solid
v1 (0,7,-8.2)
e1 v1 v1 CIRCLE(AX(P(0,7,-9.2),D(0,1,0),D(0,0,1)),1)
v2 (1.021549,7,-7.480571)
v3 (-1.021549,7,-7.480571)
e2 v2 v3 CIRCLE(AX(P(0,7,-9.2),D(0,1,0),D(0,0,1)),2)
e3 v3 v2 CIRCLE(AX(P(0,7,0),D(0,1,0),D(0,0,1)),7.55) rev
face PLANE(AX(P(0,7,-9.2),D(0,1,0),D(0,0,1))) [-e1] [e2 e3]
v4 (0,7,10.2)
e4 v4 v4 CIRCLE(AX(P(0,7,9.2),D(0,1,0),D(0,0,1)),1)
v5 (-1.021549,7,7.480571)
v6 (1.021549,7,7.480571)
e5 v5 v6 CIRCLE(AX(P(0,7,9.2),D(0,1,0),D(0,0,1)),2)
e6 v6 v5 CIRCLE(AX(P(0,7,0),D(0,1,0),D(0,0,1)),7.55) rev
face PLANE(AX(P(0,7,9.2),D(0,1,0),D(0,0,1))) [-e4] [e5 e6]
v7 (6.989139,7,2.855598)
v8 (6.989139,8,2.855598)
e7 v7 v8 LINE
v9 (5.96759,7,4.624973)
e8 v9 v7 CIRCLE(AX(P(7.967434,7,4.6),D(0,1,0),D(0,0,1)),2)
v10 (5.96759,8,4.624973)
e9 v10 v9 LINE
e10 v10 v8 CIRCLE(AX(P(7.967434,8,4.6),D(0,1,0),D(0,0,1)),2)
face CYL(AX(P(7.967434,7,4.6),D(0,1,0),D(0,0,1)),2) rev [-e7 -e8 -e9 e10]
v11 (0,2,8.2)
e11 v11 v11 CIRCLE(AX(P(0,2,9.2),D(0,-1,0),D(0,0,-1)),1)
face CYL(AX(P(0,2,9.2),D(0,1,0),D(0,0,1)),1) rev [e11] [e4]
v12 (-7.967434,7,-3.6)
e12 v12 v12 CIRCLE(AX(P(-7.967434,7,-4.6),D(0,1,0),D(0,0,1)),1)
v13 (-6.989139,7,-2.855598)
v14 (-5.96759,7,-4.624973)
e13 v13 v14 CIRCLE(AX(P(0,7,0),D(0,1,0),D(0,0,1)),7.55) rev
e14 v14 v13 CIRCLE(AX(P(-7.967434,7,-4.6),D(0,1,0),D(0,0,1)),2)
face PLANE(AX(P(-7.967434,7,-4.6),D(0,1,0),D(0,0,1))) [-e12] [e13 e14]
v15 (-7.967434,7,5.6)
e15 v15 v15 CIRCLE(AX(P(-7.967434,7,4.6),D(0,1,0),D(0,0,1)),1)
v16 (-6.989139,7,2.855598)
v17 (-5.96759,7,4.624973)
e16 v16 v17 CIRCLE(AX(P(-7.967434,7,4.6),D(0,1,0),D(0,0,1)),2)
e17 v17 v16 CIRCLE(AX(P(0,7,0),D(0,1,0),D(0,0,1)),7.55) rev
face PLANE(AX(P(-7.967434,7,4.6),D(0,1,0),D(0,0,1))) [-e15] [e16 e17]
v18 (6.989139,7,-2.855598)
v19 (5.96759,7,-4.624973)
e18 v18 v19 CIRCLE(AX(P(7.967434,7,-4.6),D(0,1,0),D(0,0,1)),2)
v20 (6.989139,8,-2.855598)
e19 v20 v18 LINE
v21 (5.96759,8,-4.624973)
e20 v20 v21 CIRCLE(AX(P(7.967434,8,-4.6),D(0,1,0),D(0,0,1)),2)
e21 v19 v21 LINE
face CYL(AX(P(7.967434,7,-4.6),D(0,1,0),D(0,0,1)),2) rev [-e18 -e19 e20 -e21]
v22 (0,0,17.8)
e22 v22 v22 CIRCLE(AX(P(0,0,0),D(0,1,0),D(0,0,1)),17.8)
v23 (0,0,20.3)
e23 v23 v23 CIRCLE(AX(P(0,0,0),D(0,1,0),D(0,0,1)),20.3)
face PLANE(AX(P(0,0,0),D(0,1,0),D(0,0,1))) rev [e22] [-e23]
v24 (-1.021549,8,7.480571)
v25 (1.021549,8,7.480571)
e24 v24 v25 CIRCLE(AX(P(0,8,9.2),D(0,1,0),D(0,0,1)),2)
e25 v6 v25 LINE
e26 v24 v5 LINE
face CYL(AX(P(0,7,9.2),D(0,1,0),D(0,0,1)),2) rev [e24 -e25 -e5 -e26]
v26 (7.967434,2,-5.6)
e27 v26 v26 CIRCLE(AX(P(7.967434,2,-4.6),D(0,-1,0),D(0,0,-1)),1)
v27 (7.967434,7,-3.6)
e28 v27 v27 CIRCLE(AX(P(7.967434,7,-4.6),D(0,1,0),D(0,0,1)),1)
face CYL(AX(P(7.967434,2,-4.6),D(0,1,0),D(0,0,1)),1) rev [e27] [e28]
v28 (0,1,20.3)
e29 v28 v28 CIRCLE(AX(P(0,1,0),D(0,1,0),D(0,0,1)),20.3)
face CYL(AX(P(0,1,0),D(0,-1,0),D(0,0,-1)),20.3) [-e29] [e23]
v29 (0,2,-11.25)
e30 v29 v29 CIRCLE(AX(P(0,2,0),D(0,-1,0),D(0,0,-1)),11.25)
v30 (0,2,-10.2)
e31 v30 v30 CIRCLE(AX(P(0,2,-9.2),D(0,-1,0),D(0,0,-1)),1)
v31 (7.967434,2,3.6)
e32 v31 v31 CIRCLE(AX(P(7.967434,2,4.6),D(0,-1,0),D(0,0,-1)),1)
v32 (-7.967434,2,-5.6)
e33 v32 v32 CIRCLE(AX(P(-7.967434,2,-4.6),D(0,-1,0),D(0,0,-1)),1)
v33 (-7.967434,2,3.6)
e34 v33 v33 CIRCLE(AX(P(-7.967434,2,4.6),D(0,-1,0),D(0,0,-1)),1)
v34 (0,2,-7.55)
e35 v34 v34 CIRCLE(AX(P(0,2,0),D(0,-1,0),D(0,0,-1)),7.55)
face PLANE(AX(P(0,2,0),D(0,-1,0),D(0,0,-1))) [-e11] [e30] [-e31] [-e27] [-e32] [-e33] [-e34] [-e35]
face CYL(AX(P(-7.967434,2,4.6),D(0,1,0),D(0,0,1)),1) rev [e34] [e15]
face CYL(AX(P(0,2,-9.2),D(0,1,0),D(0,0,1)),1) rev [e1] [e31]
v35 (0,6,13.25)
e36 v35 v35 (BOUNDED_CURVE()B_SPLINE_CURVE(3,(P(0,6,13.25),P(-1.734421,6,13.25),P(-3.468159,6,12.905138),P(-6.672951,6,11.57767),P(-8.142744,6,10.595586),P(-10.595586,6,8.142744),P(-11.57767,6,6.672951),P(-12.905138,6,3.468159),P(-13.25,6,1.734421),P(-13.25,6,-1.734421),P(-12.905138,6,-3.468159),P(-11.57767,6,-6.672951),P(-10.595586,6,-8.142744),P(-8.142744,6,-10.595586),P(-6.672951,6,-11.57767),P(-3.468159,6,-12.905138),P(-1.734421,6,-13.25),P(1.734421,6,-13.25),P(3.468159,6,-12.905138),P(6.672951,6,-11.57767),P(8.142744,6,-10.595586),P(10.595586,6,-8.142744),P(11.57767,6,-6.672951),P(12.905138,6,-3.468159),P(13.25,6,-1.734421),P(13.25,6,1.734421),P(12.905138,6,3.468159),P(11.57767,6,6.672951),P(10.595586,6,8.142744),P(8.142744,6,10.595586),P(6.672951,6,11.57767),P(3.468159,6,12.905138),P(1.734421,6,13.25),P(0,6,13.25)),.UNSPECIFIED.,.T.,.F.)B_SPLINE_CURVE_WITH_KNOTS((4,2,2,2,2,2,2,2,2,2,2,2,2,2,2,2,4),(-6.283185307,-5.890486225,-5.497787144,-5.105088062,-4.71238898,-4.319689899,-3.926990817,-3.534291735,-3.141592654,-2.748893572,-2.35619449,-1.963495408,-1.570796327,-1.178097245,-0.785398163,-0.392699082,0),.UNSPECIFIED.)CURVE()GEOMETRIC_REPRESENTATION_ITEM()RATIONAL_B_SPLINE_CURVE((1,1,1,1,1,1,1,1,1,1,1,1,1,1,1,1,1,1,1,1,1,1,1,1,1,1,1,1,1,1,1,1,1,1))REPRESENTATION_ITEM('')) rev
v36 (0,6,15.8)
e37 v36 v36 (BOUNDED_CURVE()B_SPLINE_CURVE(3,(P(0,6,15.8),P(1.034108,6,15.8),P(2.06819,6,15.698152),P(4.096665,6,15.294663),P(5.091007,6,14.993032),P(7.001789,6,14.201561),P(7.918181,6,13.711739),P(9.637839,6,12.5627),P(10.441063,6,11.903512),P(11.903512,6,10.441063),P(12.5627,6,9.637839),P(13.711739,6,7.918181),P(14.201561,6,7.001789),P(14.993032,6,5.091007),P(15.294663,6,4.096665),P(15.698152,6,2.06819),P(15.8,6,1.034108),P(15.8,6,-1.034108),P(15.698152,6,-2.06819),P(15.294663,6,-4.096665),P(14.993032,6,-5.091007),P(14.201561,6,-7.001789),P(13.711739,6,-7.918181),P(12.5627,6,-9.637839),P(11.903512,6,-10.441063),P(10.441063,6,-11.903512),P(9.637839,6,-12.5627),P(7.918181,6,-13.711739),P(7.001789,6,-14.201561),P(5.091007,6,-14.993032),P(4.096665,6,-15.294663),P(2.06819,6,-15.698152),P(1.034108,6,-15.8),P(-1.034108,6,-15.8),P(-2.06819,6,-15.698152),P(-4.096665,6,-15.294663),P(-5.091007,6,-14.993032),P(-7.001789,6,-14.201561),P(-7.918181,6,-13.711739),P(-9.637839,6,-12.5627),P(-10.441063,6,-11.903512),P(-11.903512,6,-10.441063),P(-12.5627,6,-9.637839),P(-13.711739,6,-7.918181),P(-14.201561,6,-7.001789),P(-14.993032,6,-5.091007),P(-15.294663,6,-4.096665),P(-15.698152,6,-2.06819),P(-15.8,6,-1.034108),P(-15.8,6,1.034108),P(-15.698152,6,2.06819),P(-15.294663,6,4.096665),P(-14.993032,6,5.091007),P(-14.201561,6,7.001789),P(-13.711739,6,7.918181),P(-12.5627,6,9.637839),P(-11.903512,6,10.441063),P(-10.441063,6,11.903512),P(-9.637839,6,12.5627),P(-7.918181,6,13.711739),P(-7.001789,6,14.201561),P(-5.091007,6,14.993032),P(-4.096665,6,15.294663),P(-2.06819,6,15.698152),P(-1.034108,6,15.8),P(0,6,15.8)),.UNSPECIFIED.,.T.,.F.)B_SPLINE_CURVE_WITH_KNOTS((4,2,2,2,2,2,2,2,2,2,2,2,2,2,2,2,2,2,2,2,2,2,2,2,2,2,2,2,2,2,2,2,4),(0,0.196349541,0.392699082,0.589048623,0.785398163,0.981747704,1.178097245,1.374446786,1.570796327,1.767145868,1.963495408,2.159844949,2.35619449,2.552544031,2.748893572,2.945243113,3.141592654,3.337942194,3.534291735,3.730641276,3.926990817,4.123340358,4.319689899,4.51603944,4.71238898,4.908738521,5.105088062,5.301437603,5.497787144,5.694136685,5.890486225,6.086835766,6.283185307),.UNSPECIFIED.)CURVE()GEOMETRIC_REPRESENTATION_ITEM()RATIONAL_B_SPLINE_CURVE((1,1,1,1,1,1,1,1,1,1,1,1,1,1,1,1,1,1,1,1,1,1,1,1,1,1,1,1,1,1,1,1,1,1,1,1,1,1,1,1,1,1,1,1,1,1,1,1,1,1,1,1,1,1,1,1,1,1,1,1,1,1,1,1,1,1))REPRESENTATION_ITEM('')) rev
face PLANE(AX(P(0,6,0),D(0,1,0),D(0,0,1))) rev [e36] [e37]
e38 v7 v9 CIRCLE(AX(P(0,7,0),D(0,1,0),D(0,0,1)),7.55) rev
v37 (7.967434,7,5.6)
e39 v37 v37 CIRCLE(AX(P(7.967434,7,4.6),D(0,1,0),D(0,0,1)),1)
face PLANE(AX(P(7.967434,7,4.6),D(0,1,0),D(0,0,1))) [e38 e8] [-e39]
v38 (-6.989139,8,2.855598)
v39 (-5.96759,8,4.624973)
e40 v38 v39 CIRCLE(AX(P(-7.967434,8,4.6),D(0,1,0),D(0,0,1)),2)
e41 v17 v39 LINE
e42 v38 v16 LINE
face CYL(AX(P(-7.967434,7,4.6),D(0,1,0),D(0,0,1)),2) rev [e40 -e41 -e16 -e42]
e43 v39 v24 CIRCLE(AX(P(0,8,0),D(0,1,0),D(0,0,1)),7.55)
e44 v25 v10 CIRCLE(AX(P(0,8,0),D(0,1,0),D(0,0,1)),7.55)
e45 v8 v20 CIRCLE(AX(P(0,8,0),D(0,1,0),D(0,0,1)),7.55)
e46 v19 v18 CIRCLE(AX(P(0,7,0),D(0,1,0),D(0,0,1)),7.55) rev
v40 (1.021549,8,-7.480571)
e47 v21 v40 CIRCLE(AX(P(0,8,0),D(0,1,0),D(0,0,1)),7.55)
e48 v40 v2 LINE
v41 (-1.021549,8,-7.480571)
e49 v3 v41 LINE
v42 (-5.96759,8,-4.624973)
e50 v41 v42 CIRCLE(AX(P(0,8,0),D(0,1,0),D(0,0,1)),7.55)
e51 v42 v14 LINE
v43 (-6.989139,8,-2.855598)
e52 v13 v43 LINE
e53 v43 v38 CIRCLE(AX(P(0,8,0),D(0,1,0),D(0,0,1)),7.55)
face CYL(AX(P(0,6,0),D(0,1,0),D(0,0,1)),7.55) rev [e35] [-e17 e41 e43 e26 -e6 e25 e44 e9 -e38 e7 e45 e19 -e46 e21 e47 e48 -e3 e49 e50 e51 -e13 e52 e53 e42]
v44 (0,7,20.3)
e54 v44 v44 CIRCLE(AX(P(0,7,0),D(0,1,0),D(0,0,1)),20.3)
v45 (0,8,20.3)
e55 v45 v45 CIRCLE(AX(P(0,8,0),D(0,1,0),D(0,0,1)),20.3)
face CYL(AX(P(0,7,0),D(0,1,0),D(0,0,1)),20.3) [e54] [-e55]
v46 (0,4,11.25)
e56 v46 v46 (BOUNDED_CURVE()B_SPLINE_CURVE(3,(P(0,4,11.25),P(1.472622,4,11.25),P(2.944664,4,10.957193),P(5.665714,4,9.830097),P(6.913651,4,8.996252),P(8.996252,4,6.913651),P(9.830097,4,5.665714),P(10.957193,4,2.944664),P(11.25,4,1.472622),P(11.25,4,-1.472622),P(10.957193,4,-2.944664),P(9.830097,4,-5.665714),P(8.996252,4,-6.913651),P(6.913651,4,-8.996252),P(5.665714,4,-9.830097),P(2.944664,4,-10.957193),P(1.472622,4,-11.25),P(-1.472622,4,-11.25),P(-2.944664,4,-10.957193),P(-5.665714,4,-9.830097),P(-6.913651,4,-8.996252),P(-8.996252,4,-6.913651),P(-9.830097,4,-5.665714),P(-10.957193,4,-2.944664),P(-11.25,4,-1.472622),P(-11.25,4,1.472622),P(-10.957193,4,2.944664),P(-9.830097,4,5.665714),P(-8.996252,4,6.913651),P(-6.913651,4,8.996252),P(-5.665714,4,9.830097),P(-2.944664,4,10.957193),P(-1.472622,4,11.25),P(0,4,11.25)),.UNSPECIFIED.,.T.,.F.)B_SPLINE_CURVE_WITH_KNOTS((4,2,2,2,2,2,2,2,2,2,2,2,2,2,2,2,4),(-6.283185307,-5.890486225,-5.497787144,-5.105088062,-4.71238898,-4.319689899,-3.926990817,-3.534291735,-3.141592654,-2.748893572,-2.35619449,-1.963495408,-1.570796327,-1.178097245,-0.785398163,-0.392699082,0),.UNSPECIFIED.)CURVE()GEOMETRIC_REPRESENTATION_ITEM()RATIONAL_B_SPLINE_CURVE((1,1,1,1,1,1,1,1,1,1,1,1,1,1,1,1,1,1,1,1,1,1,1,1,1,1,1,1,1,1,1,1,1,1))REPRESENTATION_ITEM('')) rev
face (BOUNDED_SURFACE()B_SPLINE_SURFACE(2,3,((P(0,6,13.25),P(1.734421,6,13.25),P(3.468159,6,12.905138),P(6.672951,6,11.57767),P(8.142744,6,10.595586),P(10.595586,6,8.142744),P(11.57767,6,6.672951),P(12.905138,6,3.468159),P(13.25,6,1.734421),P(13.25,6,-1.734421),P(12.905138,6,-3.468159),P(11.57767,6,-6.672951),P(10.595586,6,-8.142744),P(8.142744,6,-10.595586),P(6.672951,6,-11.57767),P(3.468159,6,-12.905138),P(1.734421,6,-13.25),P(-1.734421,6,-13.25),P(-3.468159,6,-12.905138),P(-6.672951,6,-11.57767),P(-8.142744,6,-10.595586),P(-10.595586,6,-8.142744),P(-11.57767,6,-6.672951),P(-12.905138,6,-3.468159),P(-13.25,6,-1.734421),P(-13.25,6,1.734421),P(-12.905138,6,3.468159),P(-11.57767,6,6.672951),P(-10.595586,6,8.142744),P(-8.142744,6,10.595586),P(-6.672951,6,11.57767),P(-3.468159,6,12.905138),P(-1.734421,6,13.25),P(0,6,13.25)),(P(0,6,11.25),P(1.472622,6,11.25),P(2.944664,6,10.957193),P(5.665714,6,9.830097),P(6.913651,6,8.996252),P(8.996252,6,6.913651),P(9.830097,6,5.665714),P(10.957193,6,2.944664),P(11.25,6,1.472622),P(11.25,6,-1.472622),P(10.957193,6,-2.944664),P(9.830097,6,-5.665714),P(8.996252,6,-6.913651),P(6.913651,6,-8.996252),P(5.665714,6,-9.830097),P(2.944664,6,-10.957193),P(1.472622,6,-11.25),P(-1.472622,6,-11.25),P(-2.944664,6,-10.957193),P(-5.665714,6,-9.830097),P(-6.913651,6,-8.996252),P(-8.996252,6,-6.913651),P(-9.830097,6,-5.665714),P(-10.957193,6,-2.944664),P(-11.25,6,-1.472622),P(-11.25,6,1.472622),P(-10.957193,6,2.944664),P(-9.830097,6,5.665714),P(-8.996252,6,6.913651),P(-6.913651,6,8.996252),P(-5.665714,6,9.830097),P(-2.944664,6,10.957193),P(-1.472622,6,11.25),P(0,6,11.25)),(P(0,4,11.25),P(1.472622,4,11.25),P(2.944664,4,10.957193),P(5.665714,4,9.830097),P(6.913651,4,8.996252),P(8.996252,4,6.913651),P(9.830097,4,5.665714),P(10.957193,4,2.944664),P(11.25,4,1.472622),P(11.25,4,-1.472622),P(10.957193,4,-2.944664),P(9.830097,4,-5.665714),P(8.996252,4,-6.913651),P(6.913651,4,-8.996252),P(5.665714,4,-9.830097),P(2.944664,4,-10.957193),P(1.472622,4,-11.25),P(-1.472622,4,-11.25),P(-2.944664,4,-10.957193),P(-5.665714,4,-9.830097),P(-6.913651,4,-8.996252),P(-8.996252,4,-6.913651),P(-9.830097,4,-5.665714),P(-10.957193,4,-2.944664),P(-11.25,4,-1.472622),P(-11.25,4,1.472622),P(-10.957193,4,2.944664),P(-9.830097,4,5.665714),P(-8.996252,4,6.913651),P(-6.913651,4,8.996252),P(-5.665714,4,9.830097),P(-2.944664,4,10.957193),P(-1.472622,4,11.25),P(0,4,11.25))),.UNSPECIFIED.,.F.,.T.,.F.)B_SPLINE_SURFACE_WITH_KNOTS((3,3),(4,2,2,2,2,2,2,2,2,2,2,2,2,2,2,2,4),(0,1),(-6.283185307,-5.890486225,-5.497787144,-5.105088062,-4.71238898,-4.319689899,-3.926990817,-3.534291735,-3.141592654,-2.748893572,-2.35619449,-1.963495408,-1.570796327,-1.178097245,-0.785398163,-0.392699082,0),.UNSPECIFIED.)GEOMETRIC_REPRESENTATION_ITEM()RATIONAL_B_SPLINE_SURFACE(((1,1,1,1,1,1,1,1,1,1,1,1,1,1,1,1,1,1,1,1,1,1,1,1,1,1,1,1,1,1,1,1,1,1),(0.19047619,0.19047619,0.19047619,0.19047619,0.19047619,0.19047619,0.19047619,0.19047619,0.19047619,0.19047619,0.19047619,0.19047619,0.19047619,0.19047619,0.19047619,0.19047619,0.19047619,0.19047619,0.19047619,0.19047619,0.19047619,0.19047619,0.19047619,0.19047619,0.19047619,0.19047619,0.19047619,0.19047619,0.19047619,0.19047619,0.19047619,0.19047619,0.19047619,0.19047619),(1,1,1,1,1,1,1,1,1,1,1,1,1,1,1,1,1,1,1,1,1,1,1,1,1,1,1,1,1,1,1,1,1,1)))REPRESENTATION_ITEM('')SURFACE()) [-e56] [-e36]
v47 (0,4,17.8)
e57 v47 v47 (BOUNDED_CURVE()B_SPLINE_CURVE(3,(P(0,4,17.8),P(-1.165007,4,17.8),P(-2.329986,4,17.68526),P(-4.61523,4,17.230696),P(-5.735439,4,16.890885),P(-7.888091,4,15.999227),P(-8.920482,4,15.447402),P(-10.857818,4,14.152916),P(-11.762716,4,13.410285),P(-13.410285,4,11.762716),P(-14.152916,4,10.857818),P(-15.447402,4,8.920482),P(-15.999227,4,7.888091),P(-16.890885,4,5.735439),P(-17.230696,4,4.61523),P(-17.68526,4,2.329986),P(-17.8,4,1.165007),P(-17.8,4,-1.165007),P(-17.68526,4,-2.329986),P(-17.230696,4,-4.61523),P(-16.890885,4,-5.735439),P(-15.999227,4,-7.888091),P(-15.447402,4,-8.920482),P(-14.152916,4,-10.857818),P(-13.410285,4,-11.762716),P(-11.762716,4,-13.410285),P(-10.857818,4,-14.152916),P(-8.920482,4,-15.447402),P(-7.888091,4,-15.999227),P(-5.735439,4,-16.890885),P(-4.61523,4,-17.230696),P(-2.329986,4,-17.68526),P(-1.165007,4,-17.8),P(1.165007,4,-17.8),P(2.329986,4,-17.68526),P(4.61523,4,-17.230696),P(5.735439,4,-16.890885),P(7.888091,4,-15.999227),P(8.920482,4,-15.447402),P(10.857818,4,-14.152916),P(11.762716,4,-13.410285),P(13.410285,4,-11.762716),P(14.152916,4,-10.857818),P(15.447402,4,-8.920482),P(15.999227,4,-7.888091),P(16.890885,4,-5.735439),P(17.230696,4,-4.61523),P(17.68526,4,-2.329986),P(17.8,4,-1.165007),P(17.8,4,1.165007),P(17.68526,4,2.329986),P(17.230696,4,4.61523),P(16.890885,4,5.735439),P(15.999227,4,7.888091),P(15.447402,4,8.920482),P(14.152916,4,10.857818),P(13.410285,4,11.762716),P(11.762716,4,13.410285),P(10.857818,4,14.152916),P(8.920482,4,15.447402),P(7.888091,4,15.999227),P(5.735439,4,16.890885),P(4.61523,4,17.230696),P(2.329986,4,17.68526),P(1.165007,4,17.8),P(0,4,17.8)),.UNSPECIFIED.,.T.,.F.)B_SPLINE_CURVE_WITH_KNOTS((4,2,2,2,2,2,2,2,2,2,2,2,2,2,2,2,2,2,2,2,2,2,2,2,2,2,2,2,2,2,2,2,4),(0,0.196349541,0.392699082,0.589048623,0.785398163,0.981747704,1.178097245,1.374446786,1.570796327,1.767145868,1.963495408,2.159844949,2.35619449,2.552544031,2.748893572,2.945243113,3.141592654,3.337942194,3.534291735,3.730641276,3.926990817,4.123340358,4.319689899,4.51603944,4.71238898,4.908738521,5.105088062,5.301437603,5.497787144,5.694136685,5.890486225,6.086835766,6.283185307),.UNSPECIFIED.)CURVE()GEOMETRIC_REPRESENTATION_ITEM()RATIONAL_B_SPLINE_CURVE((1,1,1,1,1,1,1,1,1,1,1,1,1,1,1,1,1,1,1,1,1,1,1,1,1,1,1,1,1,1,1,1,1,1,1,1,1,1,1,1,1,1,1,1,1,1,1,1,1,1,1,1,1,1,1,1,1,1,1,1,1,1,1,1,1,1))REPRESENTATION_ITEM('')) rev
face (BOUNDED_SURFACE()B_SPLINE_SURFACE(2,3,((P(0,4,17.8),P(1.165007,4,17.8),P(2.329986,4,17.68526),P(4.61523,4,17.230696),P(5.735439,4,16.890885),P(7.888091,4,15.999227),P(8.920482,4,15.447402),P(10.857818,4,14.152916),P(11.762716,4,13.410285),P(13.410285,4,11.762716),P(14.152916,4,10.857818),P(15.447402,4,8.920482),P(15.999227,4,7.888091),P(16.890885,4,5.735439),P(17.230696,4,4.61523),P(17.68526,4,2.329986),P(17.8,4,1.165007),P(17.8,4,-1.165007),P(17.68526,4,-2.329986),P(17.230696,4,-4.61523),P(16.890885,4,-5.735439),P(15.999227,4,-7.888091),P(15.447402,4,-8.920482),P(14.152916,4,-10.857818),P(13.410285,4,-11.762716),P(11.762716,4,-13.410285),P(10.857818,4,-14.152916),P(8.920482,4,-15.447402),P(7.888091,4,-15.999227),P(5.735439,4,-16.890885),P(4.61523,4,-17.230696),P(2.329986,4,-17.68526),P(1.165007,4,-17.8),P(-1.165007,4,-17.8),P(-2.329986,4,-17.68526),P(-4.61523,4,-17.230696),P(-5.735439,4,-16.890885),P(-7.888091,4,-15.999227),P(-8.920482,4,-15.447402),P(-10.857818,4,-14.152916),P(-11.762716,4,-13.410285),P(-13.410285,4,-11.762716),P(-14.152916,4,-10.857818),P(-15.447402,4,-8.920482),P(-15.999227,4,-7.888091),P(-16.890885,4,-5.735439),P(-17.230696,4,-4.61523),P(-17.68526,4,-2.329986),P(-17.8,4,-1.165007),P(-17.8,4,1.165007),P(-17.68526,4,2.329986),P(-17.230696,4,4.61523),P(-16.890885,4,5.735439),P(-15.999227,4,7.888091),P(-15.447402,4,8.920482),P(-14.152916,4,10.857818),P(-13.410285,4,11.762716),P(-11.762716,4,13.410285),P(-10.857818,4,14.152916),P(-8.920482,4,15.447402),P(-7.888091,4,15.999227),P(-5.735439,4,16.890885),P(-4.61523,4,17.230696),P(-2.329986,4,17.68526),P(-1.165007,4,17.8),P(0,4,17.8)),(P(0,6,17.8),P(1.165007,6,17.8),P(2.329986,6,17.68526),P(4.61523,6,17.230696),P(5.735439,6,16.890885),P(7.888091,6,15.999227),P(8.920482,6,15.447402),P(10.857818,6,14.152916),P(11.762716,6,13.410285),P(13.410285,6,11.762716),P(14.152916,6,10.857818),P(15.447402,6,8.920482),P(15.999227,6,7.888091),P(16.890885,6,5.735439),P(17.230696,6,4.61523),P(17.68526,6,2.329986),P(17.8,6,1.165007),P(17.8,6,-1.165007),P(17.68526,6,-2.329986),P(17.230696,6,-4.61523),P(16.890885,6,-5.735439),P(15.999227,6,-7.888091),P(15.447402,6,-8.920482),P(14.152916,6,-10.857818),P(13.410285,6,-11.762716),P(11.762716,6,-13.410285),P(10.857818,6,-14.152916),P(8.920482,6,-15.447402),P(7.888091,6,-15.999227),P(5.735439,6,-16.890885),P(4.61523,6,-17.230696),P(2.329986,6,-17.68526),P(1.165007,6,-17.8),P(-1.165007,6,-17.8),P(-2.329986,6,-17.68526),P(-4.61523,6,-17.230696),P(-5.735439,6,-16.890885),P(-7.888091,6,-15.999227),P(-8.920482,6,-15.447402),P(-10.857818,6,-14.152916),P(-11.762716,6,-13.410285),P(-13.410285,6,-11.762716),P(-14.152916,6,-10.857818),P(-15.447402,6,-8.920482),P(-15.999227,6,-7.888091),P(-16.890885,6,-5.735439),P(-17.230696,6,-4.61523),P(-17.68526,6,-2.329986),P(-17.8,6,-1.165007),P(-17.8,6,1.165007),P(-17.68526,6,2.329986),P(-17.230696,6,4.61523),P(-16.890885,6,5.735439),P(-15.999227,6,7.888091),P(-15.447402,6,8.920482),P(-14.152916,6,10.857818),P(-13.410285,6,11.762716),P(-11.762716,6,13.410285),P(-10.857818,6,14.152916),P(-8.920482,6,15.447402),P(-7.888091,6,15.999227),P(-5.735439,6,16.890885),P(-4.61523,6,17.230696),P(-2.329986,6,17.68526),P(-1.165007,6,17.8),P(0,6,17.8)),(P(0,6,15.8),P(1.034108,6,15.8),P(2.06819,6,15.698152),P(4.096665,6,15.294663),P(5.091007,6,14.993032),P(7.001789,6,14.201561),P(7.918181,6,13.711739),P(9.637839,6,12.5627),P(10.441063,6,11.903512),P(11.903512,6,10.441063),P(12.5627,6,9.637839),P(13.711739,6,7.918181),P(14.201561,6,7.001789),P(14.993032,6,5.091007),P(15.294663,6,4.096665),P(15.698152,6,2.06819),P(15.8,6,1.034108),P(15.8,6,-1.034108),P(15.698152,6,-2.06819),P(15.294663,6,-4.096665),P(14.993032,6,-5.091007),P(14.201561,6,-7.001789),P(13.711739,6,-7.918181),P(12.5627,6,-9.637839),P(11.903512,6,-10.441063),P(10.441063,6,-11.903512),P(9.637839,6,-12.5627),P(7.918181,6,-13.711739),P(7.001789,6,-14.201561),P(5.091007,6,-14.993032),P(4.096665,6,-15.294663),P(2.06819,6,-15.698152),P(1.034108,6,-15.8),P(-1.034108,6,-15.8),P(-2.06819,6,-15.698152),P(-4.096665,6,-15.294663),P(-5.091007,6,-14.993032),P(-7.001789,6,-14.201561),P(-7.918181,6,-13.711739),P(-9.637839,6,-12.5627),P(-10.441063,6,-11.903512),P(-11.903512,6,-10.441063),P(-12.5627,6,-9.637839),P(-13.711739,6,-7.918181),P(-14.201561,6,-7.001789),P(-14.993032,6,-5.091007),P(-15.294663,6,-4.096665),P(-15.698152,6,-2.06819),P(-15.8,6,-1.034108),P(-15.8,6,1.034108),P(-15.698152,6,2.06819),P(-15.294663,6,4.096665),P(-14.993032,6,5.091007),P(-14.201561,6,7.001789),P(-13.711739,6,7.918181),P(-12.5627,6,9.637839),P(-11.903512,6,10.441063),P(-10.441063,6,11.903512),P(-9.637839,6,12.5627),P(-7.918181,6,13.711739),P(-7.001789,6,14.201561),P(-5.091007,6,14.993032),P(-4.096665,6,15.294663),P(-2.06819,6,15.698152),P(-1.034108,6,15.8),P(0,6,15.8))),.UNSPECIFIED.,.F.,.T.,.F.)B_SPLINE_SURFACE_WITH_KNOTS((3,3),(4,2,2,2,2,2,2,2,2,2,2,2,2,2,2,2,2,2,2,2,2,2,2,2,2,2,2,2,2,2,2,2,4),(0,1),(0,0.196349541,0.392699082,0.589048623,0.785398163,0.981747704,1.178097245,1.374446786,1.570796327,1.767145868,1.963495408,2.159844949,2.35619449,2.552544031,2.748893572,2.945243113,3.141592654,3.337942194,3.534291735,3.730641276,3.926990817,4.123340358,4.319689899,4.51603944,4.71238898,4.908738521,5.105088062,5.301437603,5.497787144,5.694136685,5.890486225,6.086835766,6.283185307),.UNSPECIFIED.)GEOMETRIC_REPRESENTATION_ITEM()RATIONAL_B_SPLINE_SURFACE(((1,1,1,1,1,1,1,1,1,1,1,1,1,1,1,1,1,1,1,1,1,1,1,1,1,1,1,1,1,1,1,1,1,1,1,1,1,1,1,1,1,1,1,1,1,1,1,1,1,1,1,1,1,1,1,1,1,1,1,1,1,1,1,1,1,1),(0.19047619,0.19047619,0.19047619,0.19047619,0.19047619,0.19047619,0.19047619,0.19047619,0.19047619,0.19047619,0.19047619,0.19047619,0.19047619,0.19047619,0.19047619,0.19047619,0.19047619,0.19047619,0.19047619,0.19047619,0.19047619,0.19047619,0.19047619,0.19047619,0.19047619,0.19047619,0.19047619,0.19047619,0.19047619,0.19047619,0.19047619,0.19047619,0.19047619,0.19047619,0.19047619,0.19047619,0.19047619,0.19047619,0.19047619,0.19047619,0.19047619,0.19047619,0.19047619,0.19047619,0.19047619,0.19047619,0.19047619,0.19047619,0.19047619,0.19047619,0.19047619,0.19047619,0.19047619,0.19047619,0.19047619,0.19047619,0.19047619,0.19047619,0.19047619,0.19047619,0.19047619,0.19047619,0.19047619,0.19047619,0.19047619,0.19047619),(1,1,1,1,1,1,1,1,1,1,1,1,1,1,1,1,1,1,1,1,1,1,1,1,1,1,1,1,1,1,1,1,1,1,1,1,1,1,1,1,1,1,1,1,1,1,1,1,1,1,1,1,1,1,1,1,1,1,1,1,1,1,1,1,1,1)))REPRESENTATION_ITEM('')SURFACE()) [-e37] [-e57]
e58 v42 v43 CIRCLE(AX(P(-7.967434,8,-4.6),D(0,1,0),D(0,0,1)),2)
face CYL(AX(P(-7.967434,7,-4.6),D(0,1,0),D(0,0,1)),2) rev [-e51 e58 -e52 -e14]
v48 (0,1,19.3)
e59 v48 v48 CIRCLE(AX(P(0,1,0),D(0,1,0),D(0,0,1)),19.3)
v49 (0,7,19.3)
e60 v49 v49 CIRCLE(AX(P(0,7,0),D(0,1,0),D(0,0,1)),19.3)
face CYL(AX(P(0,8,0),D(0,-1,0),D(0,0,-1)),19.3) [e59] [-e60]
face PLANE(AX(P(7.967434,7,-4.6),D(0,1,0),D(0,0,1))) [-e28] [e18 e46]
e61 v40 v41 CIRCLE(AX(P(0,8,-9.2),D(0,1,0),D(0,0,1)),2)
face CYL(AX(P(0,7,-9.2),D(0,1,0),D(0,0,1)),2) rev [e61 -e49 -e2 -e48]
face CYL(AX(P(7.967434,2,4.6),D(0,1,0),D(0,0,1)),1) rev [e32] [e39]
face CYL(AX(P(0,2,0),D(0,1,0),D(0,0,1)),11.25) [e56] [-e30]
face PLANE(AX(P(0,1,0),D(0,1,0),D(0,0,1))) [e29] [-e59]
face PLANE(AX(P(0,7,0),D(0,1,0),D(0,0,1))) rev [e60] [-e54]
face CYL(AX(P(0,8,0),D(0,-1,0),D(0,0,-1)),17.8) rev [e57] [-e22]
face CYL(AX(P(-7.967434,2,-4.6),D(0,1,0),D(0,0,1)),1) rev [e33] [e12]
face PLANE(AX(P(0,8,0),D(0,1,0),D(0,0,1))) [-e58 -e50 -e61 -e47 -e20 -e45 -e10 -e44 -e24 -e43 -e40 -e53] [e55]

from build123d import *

# Parameters (mm, degrees)
SKETCH2_R           = 19.3
SKETCH2_R_2         = 17.8
BOSS_EXTRUDE1_DEPTH = 8
SKETCH2_3_R         = 20.3
SKETCH2_3_R_2       = 19.3
BOSS_EXTRUDE2_DEPTH = 1
BOSS_EXTRUDE3_START = 7
SKETCH2_4_R         = 20.3
SKETCH2_4_R_2       = 19.3
BOSS_EXTRUDE3_DEPTH = 1
BOSS_EXTRUDE4_START = -2
SKETCH3_R           = 17.8
SKETCH3_R_2         = 7.55
BOSS_EXTRUDE4_DEPTH = 2
BOSS_EXTRUDE5_START = 4
SKETCH4_R           = 11.25
SKETCH4_R_2         = 7.55
SKETCH4_R_3         = 1
BOSS_EXTRUDE5_DEPTH = 4
SKETCH5_R           = 1
CUT_EXTRUDE1_DEPTH  = 6
SKETCH6_R           = 2
CUT_EXTRUDE2_DEPTH  = 1
FILLET1_SIZE        = 2


with BuildPart() as part:
    # Sketch2 → Boss-Extrude1 (new body)
    with BuildSketch(Plane(origin=(0, 0, 0), x_dir=(1, 0, 0), z_dir=(0, 1, 0))):
        with Locations(Location((0, 0, 0), (0, 0, 270))):
            Circle(SKETCH2_R)
        with Locations(Location((0, 0, 0), (0, 0, 270))):
            Circle(SKETCH2_R_2, mode=Mode.SUBTRACT)
    extrude(amount=BOSS_EXTRUDE1_DEPTH)

    # Sketch2<3> → Boss-Extrude2 (add)
    with BuildSketch(Plane(origin=(0, 0, 0), x_dir=(1, 0, 0), z_dir=(0, 1, 0))):
        with Locations(Location((0, 0, 0), (0, 0, 270))):
            Circle(SKETCH2_3_R)
        with Locations(Location((0, 0, 0), (0, 0, 270))):
            Circle(SKETCH2_3_R_2, mode=Mode.SUBTRACT)
    extrude(amount=BOSS_EXTRUDE2_DEPTH)

    # Sketch2<4> → Boss-Extrude3 (add)
    with BuildSketch(Plane(origin=(0, 0, 0), x_dir=(1, 0, 0), z_dir=(0, 1, 0)).offset(BOSS_EXTRUDE3_START)):
        with Locations(Location((0, 0, 0), (0, 0, 270))):
            Circle(SKETCH2_4_R)
        with Locations(Location((0, 0, 0), (0, 0, 270))):
            Circle(SKETCH2_4_R_2, mode=Mode.SUBTRACT)
    extrude(amount=BOSS_EXTRUDE3_DEPTH)

    # Sketch3 → Boss-Extrude4 (add)
    with BuildSketch(Plane(origin=(0, 8, 0), x_dir=(1, 0, 0), z_dir=(0, 1, 0)).offset(BOSS_EXTRUDE4_START)):
        with Locations(Location((0, 0, 0), (0, 0, 270))):
            Circle(SKETCH3_R)
        with Locations(Location((0, 0, 0), (0, 0, 270))):
            Circle(SKETCH3_R_2, mode=Mode.SUBTRACT)
    extrude(amount=BOSS_EXTRUDE4_DEPTH)

    # Sketch4 → Boss-Extrude5 (add)
    with BuildSketch(Plane.XZ.offset(-6).offset(BOSS_EXTRUDE5_START)):
        with Locations(Location((0, 0, 0), (0, 0, 90))):
            Circle(SKETCH4_R)
        with Locations(Location((0, 0, 0), (0, 0, 90))):
            Circle(SKETCH4_R_2, mode=Mode.SUBTRACT)
        with Locations(Location((0, 9.2, 0), (0, 0, 270))):
            Circle(SKETCH4_R_3, mode=Mode.SUBTRACT)
        with Locations(Location((7.967433715, 4.6, 0), (0, 0, 270))):
            Circle(SKETCH4_R_3, mode=Mode.SUBTRACT)
        with Locations(Location((7.967433715, -4.6, 0), (0, 0, 270))):
            Circle(SKETCH4_R_3, mode=Mode.SUBTRACT)
        with Locations(Location((0, -9.2, 0), (0, 0, 270))):
            Circle(SKETCH4_R_3, mode=Mode.SUBTRACT)
        with Locations(Location((-7.967433715, -4.6, 0), (0, 0, 270))):
            Circle(SKETCH4_R_3, mode=Mode.SUBTRACT)
        with Locations(Location((-7.967433715, 4.6, 0), (0, 0, 270))):
            Circle(SKETCH4_R_3, mode=Mode.SUBTRACT)
    extrude(amount=-BOSS_EXTRUDE5_DEPTH)

    # Sketch5 → Cut-Extrude1 (cut)
    with BuildSketch(Plane.XZ.offset(-2)):
        with Locations(Location((0, 9.2, 0), (0, 0, 90))):
            Circle(SKETCH5_R)
        with Locations(Location((7.967433715, 4.6, 0), (0, 0, 90))):
            Circle(SKETCH5_R)
        with Locations(Location((7.967433715, -4.6, 0), (0, 0, 90))):
            Circle(SKETCH5_R)
        with Locations(Location((0, -9.2, 0), (0, 0, 90))):
            Circle(SKETCH5_R)
        with Locations(Location((-7.967433715, -4.6, 0), (0, 0, 90))):
            Circle(SKETCH5_R)
        with Locations(Location((-7.967433715, 4.6, 0), (0, 0, 90))):
            Circle(SKETCH5_R)
    extrude(amount=-CUT_EXTRUDE1_DEPTH, mode=Mode.SUBTRACT)

    # Sketch6 → Cut-Extrude2 (cut)
    with BuildSketch(Plane(origin=(0, 8, 0), x_dir=(1, 0, 0), z_dir=(0, 1, 0))):
        with Locations((0, -9.2)):
            Circle(SKETCH6_R)
        with Locations((-7.967433715, -4.6)):
            Circle(SKETCH6_R)
        with Locations((-7.967433715, 4.6)):
            Circle(SKETCH6_R)
        with Locations((0, 9.2)):
            Circle(SKETCH6_R)
        with Locations((7.967433715, 4.6)):
            Circle(SKETCH6_R)
        with Locations((7.967433715, -4.6)):
            Circle(SKETCH6_R)
    extrude(amount=-CUT_EXTRUDE2_DEPTH, mode=Mode.SUBTRACT)

    # Fillet1
    # a fillet whose section is not a circle: 2 mm, written as the material it adds along each edge
    with BuildSketch(Plane(origin=(0, 6, 0), x_dir=(0, 0, 1), z_dir=(-1, 0, 0))) as fillet1_piece_1:
        with BuildLine():
            Bezier((17.8, -FILLET1_SIZE), (17.8, 0), (17.8 - FILLET1_SIZE, 0), weights=[1, 0.19047619, 1])
            Line((17.8 - FILLET1_SIZE, 0), (17.8, 0))
            Line((17.8, 0), (17.8, -FILLET1_SIZE))
        make_face()
    revolve(axis=Axis((0, 6, 0), (0, 1, 0)))
    with BuildSketch(Plane(origin=(0, 6, 0), x_dir=(0, 0, 1), z_dir=(1, 0, 0))) as fillet1_piece_2:
        with BuildLine():
            Bezier((11.25 + FILLET1_SIZE, 0), (11.25, 0), (11.25, FILLET1_SIZE), weights=[1, 0.19047619, 1])
            Line((11.25, FILLET1_SIZE), (11.25, 0))
            Line((11.25, 0), (11.25 + FILLET1_SIZE, 0))
        make_face()
    revolve(axis=Axis((0, 6, 0), (0, -1, 0)))


solid = part.part
